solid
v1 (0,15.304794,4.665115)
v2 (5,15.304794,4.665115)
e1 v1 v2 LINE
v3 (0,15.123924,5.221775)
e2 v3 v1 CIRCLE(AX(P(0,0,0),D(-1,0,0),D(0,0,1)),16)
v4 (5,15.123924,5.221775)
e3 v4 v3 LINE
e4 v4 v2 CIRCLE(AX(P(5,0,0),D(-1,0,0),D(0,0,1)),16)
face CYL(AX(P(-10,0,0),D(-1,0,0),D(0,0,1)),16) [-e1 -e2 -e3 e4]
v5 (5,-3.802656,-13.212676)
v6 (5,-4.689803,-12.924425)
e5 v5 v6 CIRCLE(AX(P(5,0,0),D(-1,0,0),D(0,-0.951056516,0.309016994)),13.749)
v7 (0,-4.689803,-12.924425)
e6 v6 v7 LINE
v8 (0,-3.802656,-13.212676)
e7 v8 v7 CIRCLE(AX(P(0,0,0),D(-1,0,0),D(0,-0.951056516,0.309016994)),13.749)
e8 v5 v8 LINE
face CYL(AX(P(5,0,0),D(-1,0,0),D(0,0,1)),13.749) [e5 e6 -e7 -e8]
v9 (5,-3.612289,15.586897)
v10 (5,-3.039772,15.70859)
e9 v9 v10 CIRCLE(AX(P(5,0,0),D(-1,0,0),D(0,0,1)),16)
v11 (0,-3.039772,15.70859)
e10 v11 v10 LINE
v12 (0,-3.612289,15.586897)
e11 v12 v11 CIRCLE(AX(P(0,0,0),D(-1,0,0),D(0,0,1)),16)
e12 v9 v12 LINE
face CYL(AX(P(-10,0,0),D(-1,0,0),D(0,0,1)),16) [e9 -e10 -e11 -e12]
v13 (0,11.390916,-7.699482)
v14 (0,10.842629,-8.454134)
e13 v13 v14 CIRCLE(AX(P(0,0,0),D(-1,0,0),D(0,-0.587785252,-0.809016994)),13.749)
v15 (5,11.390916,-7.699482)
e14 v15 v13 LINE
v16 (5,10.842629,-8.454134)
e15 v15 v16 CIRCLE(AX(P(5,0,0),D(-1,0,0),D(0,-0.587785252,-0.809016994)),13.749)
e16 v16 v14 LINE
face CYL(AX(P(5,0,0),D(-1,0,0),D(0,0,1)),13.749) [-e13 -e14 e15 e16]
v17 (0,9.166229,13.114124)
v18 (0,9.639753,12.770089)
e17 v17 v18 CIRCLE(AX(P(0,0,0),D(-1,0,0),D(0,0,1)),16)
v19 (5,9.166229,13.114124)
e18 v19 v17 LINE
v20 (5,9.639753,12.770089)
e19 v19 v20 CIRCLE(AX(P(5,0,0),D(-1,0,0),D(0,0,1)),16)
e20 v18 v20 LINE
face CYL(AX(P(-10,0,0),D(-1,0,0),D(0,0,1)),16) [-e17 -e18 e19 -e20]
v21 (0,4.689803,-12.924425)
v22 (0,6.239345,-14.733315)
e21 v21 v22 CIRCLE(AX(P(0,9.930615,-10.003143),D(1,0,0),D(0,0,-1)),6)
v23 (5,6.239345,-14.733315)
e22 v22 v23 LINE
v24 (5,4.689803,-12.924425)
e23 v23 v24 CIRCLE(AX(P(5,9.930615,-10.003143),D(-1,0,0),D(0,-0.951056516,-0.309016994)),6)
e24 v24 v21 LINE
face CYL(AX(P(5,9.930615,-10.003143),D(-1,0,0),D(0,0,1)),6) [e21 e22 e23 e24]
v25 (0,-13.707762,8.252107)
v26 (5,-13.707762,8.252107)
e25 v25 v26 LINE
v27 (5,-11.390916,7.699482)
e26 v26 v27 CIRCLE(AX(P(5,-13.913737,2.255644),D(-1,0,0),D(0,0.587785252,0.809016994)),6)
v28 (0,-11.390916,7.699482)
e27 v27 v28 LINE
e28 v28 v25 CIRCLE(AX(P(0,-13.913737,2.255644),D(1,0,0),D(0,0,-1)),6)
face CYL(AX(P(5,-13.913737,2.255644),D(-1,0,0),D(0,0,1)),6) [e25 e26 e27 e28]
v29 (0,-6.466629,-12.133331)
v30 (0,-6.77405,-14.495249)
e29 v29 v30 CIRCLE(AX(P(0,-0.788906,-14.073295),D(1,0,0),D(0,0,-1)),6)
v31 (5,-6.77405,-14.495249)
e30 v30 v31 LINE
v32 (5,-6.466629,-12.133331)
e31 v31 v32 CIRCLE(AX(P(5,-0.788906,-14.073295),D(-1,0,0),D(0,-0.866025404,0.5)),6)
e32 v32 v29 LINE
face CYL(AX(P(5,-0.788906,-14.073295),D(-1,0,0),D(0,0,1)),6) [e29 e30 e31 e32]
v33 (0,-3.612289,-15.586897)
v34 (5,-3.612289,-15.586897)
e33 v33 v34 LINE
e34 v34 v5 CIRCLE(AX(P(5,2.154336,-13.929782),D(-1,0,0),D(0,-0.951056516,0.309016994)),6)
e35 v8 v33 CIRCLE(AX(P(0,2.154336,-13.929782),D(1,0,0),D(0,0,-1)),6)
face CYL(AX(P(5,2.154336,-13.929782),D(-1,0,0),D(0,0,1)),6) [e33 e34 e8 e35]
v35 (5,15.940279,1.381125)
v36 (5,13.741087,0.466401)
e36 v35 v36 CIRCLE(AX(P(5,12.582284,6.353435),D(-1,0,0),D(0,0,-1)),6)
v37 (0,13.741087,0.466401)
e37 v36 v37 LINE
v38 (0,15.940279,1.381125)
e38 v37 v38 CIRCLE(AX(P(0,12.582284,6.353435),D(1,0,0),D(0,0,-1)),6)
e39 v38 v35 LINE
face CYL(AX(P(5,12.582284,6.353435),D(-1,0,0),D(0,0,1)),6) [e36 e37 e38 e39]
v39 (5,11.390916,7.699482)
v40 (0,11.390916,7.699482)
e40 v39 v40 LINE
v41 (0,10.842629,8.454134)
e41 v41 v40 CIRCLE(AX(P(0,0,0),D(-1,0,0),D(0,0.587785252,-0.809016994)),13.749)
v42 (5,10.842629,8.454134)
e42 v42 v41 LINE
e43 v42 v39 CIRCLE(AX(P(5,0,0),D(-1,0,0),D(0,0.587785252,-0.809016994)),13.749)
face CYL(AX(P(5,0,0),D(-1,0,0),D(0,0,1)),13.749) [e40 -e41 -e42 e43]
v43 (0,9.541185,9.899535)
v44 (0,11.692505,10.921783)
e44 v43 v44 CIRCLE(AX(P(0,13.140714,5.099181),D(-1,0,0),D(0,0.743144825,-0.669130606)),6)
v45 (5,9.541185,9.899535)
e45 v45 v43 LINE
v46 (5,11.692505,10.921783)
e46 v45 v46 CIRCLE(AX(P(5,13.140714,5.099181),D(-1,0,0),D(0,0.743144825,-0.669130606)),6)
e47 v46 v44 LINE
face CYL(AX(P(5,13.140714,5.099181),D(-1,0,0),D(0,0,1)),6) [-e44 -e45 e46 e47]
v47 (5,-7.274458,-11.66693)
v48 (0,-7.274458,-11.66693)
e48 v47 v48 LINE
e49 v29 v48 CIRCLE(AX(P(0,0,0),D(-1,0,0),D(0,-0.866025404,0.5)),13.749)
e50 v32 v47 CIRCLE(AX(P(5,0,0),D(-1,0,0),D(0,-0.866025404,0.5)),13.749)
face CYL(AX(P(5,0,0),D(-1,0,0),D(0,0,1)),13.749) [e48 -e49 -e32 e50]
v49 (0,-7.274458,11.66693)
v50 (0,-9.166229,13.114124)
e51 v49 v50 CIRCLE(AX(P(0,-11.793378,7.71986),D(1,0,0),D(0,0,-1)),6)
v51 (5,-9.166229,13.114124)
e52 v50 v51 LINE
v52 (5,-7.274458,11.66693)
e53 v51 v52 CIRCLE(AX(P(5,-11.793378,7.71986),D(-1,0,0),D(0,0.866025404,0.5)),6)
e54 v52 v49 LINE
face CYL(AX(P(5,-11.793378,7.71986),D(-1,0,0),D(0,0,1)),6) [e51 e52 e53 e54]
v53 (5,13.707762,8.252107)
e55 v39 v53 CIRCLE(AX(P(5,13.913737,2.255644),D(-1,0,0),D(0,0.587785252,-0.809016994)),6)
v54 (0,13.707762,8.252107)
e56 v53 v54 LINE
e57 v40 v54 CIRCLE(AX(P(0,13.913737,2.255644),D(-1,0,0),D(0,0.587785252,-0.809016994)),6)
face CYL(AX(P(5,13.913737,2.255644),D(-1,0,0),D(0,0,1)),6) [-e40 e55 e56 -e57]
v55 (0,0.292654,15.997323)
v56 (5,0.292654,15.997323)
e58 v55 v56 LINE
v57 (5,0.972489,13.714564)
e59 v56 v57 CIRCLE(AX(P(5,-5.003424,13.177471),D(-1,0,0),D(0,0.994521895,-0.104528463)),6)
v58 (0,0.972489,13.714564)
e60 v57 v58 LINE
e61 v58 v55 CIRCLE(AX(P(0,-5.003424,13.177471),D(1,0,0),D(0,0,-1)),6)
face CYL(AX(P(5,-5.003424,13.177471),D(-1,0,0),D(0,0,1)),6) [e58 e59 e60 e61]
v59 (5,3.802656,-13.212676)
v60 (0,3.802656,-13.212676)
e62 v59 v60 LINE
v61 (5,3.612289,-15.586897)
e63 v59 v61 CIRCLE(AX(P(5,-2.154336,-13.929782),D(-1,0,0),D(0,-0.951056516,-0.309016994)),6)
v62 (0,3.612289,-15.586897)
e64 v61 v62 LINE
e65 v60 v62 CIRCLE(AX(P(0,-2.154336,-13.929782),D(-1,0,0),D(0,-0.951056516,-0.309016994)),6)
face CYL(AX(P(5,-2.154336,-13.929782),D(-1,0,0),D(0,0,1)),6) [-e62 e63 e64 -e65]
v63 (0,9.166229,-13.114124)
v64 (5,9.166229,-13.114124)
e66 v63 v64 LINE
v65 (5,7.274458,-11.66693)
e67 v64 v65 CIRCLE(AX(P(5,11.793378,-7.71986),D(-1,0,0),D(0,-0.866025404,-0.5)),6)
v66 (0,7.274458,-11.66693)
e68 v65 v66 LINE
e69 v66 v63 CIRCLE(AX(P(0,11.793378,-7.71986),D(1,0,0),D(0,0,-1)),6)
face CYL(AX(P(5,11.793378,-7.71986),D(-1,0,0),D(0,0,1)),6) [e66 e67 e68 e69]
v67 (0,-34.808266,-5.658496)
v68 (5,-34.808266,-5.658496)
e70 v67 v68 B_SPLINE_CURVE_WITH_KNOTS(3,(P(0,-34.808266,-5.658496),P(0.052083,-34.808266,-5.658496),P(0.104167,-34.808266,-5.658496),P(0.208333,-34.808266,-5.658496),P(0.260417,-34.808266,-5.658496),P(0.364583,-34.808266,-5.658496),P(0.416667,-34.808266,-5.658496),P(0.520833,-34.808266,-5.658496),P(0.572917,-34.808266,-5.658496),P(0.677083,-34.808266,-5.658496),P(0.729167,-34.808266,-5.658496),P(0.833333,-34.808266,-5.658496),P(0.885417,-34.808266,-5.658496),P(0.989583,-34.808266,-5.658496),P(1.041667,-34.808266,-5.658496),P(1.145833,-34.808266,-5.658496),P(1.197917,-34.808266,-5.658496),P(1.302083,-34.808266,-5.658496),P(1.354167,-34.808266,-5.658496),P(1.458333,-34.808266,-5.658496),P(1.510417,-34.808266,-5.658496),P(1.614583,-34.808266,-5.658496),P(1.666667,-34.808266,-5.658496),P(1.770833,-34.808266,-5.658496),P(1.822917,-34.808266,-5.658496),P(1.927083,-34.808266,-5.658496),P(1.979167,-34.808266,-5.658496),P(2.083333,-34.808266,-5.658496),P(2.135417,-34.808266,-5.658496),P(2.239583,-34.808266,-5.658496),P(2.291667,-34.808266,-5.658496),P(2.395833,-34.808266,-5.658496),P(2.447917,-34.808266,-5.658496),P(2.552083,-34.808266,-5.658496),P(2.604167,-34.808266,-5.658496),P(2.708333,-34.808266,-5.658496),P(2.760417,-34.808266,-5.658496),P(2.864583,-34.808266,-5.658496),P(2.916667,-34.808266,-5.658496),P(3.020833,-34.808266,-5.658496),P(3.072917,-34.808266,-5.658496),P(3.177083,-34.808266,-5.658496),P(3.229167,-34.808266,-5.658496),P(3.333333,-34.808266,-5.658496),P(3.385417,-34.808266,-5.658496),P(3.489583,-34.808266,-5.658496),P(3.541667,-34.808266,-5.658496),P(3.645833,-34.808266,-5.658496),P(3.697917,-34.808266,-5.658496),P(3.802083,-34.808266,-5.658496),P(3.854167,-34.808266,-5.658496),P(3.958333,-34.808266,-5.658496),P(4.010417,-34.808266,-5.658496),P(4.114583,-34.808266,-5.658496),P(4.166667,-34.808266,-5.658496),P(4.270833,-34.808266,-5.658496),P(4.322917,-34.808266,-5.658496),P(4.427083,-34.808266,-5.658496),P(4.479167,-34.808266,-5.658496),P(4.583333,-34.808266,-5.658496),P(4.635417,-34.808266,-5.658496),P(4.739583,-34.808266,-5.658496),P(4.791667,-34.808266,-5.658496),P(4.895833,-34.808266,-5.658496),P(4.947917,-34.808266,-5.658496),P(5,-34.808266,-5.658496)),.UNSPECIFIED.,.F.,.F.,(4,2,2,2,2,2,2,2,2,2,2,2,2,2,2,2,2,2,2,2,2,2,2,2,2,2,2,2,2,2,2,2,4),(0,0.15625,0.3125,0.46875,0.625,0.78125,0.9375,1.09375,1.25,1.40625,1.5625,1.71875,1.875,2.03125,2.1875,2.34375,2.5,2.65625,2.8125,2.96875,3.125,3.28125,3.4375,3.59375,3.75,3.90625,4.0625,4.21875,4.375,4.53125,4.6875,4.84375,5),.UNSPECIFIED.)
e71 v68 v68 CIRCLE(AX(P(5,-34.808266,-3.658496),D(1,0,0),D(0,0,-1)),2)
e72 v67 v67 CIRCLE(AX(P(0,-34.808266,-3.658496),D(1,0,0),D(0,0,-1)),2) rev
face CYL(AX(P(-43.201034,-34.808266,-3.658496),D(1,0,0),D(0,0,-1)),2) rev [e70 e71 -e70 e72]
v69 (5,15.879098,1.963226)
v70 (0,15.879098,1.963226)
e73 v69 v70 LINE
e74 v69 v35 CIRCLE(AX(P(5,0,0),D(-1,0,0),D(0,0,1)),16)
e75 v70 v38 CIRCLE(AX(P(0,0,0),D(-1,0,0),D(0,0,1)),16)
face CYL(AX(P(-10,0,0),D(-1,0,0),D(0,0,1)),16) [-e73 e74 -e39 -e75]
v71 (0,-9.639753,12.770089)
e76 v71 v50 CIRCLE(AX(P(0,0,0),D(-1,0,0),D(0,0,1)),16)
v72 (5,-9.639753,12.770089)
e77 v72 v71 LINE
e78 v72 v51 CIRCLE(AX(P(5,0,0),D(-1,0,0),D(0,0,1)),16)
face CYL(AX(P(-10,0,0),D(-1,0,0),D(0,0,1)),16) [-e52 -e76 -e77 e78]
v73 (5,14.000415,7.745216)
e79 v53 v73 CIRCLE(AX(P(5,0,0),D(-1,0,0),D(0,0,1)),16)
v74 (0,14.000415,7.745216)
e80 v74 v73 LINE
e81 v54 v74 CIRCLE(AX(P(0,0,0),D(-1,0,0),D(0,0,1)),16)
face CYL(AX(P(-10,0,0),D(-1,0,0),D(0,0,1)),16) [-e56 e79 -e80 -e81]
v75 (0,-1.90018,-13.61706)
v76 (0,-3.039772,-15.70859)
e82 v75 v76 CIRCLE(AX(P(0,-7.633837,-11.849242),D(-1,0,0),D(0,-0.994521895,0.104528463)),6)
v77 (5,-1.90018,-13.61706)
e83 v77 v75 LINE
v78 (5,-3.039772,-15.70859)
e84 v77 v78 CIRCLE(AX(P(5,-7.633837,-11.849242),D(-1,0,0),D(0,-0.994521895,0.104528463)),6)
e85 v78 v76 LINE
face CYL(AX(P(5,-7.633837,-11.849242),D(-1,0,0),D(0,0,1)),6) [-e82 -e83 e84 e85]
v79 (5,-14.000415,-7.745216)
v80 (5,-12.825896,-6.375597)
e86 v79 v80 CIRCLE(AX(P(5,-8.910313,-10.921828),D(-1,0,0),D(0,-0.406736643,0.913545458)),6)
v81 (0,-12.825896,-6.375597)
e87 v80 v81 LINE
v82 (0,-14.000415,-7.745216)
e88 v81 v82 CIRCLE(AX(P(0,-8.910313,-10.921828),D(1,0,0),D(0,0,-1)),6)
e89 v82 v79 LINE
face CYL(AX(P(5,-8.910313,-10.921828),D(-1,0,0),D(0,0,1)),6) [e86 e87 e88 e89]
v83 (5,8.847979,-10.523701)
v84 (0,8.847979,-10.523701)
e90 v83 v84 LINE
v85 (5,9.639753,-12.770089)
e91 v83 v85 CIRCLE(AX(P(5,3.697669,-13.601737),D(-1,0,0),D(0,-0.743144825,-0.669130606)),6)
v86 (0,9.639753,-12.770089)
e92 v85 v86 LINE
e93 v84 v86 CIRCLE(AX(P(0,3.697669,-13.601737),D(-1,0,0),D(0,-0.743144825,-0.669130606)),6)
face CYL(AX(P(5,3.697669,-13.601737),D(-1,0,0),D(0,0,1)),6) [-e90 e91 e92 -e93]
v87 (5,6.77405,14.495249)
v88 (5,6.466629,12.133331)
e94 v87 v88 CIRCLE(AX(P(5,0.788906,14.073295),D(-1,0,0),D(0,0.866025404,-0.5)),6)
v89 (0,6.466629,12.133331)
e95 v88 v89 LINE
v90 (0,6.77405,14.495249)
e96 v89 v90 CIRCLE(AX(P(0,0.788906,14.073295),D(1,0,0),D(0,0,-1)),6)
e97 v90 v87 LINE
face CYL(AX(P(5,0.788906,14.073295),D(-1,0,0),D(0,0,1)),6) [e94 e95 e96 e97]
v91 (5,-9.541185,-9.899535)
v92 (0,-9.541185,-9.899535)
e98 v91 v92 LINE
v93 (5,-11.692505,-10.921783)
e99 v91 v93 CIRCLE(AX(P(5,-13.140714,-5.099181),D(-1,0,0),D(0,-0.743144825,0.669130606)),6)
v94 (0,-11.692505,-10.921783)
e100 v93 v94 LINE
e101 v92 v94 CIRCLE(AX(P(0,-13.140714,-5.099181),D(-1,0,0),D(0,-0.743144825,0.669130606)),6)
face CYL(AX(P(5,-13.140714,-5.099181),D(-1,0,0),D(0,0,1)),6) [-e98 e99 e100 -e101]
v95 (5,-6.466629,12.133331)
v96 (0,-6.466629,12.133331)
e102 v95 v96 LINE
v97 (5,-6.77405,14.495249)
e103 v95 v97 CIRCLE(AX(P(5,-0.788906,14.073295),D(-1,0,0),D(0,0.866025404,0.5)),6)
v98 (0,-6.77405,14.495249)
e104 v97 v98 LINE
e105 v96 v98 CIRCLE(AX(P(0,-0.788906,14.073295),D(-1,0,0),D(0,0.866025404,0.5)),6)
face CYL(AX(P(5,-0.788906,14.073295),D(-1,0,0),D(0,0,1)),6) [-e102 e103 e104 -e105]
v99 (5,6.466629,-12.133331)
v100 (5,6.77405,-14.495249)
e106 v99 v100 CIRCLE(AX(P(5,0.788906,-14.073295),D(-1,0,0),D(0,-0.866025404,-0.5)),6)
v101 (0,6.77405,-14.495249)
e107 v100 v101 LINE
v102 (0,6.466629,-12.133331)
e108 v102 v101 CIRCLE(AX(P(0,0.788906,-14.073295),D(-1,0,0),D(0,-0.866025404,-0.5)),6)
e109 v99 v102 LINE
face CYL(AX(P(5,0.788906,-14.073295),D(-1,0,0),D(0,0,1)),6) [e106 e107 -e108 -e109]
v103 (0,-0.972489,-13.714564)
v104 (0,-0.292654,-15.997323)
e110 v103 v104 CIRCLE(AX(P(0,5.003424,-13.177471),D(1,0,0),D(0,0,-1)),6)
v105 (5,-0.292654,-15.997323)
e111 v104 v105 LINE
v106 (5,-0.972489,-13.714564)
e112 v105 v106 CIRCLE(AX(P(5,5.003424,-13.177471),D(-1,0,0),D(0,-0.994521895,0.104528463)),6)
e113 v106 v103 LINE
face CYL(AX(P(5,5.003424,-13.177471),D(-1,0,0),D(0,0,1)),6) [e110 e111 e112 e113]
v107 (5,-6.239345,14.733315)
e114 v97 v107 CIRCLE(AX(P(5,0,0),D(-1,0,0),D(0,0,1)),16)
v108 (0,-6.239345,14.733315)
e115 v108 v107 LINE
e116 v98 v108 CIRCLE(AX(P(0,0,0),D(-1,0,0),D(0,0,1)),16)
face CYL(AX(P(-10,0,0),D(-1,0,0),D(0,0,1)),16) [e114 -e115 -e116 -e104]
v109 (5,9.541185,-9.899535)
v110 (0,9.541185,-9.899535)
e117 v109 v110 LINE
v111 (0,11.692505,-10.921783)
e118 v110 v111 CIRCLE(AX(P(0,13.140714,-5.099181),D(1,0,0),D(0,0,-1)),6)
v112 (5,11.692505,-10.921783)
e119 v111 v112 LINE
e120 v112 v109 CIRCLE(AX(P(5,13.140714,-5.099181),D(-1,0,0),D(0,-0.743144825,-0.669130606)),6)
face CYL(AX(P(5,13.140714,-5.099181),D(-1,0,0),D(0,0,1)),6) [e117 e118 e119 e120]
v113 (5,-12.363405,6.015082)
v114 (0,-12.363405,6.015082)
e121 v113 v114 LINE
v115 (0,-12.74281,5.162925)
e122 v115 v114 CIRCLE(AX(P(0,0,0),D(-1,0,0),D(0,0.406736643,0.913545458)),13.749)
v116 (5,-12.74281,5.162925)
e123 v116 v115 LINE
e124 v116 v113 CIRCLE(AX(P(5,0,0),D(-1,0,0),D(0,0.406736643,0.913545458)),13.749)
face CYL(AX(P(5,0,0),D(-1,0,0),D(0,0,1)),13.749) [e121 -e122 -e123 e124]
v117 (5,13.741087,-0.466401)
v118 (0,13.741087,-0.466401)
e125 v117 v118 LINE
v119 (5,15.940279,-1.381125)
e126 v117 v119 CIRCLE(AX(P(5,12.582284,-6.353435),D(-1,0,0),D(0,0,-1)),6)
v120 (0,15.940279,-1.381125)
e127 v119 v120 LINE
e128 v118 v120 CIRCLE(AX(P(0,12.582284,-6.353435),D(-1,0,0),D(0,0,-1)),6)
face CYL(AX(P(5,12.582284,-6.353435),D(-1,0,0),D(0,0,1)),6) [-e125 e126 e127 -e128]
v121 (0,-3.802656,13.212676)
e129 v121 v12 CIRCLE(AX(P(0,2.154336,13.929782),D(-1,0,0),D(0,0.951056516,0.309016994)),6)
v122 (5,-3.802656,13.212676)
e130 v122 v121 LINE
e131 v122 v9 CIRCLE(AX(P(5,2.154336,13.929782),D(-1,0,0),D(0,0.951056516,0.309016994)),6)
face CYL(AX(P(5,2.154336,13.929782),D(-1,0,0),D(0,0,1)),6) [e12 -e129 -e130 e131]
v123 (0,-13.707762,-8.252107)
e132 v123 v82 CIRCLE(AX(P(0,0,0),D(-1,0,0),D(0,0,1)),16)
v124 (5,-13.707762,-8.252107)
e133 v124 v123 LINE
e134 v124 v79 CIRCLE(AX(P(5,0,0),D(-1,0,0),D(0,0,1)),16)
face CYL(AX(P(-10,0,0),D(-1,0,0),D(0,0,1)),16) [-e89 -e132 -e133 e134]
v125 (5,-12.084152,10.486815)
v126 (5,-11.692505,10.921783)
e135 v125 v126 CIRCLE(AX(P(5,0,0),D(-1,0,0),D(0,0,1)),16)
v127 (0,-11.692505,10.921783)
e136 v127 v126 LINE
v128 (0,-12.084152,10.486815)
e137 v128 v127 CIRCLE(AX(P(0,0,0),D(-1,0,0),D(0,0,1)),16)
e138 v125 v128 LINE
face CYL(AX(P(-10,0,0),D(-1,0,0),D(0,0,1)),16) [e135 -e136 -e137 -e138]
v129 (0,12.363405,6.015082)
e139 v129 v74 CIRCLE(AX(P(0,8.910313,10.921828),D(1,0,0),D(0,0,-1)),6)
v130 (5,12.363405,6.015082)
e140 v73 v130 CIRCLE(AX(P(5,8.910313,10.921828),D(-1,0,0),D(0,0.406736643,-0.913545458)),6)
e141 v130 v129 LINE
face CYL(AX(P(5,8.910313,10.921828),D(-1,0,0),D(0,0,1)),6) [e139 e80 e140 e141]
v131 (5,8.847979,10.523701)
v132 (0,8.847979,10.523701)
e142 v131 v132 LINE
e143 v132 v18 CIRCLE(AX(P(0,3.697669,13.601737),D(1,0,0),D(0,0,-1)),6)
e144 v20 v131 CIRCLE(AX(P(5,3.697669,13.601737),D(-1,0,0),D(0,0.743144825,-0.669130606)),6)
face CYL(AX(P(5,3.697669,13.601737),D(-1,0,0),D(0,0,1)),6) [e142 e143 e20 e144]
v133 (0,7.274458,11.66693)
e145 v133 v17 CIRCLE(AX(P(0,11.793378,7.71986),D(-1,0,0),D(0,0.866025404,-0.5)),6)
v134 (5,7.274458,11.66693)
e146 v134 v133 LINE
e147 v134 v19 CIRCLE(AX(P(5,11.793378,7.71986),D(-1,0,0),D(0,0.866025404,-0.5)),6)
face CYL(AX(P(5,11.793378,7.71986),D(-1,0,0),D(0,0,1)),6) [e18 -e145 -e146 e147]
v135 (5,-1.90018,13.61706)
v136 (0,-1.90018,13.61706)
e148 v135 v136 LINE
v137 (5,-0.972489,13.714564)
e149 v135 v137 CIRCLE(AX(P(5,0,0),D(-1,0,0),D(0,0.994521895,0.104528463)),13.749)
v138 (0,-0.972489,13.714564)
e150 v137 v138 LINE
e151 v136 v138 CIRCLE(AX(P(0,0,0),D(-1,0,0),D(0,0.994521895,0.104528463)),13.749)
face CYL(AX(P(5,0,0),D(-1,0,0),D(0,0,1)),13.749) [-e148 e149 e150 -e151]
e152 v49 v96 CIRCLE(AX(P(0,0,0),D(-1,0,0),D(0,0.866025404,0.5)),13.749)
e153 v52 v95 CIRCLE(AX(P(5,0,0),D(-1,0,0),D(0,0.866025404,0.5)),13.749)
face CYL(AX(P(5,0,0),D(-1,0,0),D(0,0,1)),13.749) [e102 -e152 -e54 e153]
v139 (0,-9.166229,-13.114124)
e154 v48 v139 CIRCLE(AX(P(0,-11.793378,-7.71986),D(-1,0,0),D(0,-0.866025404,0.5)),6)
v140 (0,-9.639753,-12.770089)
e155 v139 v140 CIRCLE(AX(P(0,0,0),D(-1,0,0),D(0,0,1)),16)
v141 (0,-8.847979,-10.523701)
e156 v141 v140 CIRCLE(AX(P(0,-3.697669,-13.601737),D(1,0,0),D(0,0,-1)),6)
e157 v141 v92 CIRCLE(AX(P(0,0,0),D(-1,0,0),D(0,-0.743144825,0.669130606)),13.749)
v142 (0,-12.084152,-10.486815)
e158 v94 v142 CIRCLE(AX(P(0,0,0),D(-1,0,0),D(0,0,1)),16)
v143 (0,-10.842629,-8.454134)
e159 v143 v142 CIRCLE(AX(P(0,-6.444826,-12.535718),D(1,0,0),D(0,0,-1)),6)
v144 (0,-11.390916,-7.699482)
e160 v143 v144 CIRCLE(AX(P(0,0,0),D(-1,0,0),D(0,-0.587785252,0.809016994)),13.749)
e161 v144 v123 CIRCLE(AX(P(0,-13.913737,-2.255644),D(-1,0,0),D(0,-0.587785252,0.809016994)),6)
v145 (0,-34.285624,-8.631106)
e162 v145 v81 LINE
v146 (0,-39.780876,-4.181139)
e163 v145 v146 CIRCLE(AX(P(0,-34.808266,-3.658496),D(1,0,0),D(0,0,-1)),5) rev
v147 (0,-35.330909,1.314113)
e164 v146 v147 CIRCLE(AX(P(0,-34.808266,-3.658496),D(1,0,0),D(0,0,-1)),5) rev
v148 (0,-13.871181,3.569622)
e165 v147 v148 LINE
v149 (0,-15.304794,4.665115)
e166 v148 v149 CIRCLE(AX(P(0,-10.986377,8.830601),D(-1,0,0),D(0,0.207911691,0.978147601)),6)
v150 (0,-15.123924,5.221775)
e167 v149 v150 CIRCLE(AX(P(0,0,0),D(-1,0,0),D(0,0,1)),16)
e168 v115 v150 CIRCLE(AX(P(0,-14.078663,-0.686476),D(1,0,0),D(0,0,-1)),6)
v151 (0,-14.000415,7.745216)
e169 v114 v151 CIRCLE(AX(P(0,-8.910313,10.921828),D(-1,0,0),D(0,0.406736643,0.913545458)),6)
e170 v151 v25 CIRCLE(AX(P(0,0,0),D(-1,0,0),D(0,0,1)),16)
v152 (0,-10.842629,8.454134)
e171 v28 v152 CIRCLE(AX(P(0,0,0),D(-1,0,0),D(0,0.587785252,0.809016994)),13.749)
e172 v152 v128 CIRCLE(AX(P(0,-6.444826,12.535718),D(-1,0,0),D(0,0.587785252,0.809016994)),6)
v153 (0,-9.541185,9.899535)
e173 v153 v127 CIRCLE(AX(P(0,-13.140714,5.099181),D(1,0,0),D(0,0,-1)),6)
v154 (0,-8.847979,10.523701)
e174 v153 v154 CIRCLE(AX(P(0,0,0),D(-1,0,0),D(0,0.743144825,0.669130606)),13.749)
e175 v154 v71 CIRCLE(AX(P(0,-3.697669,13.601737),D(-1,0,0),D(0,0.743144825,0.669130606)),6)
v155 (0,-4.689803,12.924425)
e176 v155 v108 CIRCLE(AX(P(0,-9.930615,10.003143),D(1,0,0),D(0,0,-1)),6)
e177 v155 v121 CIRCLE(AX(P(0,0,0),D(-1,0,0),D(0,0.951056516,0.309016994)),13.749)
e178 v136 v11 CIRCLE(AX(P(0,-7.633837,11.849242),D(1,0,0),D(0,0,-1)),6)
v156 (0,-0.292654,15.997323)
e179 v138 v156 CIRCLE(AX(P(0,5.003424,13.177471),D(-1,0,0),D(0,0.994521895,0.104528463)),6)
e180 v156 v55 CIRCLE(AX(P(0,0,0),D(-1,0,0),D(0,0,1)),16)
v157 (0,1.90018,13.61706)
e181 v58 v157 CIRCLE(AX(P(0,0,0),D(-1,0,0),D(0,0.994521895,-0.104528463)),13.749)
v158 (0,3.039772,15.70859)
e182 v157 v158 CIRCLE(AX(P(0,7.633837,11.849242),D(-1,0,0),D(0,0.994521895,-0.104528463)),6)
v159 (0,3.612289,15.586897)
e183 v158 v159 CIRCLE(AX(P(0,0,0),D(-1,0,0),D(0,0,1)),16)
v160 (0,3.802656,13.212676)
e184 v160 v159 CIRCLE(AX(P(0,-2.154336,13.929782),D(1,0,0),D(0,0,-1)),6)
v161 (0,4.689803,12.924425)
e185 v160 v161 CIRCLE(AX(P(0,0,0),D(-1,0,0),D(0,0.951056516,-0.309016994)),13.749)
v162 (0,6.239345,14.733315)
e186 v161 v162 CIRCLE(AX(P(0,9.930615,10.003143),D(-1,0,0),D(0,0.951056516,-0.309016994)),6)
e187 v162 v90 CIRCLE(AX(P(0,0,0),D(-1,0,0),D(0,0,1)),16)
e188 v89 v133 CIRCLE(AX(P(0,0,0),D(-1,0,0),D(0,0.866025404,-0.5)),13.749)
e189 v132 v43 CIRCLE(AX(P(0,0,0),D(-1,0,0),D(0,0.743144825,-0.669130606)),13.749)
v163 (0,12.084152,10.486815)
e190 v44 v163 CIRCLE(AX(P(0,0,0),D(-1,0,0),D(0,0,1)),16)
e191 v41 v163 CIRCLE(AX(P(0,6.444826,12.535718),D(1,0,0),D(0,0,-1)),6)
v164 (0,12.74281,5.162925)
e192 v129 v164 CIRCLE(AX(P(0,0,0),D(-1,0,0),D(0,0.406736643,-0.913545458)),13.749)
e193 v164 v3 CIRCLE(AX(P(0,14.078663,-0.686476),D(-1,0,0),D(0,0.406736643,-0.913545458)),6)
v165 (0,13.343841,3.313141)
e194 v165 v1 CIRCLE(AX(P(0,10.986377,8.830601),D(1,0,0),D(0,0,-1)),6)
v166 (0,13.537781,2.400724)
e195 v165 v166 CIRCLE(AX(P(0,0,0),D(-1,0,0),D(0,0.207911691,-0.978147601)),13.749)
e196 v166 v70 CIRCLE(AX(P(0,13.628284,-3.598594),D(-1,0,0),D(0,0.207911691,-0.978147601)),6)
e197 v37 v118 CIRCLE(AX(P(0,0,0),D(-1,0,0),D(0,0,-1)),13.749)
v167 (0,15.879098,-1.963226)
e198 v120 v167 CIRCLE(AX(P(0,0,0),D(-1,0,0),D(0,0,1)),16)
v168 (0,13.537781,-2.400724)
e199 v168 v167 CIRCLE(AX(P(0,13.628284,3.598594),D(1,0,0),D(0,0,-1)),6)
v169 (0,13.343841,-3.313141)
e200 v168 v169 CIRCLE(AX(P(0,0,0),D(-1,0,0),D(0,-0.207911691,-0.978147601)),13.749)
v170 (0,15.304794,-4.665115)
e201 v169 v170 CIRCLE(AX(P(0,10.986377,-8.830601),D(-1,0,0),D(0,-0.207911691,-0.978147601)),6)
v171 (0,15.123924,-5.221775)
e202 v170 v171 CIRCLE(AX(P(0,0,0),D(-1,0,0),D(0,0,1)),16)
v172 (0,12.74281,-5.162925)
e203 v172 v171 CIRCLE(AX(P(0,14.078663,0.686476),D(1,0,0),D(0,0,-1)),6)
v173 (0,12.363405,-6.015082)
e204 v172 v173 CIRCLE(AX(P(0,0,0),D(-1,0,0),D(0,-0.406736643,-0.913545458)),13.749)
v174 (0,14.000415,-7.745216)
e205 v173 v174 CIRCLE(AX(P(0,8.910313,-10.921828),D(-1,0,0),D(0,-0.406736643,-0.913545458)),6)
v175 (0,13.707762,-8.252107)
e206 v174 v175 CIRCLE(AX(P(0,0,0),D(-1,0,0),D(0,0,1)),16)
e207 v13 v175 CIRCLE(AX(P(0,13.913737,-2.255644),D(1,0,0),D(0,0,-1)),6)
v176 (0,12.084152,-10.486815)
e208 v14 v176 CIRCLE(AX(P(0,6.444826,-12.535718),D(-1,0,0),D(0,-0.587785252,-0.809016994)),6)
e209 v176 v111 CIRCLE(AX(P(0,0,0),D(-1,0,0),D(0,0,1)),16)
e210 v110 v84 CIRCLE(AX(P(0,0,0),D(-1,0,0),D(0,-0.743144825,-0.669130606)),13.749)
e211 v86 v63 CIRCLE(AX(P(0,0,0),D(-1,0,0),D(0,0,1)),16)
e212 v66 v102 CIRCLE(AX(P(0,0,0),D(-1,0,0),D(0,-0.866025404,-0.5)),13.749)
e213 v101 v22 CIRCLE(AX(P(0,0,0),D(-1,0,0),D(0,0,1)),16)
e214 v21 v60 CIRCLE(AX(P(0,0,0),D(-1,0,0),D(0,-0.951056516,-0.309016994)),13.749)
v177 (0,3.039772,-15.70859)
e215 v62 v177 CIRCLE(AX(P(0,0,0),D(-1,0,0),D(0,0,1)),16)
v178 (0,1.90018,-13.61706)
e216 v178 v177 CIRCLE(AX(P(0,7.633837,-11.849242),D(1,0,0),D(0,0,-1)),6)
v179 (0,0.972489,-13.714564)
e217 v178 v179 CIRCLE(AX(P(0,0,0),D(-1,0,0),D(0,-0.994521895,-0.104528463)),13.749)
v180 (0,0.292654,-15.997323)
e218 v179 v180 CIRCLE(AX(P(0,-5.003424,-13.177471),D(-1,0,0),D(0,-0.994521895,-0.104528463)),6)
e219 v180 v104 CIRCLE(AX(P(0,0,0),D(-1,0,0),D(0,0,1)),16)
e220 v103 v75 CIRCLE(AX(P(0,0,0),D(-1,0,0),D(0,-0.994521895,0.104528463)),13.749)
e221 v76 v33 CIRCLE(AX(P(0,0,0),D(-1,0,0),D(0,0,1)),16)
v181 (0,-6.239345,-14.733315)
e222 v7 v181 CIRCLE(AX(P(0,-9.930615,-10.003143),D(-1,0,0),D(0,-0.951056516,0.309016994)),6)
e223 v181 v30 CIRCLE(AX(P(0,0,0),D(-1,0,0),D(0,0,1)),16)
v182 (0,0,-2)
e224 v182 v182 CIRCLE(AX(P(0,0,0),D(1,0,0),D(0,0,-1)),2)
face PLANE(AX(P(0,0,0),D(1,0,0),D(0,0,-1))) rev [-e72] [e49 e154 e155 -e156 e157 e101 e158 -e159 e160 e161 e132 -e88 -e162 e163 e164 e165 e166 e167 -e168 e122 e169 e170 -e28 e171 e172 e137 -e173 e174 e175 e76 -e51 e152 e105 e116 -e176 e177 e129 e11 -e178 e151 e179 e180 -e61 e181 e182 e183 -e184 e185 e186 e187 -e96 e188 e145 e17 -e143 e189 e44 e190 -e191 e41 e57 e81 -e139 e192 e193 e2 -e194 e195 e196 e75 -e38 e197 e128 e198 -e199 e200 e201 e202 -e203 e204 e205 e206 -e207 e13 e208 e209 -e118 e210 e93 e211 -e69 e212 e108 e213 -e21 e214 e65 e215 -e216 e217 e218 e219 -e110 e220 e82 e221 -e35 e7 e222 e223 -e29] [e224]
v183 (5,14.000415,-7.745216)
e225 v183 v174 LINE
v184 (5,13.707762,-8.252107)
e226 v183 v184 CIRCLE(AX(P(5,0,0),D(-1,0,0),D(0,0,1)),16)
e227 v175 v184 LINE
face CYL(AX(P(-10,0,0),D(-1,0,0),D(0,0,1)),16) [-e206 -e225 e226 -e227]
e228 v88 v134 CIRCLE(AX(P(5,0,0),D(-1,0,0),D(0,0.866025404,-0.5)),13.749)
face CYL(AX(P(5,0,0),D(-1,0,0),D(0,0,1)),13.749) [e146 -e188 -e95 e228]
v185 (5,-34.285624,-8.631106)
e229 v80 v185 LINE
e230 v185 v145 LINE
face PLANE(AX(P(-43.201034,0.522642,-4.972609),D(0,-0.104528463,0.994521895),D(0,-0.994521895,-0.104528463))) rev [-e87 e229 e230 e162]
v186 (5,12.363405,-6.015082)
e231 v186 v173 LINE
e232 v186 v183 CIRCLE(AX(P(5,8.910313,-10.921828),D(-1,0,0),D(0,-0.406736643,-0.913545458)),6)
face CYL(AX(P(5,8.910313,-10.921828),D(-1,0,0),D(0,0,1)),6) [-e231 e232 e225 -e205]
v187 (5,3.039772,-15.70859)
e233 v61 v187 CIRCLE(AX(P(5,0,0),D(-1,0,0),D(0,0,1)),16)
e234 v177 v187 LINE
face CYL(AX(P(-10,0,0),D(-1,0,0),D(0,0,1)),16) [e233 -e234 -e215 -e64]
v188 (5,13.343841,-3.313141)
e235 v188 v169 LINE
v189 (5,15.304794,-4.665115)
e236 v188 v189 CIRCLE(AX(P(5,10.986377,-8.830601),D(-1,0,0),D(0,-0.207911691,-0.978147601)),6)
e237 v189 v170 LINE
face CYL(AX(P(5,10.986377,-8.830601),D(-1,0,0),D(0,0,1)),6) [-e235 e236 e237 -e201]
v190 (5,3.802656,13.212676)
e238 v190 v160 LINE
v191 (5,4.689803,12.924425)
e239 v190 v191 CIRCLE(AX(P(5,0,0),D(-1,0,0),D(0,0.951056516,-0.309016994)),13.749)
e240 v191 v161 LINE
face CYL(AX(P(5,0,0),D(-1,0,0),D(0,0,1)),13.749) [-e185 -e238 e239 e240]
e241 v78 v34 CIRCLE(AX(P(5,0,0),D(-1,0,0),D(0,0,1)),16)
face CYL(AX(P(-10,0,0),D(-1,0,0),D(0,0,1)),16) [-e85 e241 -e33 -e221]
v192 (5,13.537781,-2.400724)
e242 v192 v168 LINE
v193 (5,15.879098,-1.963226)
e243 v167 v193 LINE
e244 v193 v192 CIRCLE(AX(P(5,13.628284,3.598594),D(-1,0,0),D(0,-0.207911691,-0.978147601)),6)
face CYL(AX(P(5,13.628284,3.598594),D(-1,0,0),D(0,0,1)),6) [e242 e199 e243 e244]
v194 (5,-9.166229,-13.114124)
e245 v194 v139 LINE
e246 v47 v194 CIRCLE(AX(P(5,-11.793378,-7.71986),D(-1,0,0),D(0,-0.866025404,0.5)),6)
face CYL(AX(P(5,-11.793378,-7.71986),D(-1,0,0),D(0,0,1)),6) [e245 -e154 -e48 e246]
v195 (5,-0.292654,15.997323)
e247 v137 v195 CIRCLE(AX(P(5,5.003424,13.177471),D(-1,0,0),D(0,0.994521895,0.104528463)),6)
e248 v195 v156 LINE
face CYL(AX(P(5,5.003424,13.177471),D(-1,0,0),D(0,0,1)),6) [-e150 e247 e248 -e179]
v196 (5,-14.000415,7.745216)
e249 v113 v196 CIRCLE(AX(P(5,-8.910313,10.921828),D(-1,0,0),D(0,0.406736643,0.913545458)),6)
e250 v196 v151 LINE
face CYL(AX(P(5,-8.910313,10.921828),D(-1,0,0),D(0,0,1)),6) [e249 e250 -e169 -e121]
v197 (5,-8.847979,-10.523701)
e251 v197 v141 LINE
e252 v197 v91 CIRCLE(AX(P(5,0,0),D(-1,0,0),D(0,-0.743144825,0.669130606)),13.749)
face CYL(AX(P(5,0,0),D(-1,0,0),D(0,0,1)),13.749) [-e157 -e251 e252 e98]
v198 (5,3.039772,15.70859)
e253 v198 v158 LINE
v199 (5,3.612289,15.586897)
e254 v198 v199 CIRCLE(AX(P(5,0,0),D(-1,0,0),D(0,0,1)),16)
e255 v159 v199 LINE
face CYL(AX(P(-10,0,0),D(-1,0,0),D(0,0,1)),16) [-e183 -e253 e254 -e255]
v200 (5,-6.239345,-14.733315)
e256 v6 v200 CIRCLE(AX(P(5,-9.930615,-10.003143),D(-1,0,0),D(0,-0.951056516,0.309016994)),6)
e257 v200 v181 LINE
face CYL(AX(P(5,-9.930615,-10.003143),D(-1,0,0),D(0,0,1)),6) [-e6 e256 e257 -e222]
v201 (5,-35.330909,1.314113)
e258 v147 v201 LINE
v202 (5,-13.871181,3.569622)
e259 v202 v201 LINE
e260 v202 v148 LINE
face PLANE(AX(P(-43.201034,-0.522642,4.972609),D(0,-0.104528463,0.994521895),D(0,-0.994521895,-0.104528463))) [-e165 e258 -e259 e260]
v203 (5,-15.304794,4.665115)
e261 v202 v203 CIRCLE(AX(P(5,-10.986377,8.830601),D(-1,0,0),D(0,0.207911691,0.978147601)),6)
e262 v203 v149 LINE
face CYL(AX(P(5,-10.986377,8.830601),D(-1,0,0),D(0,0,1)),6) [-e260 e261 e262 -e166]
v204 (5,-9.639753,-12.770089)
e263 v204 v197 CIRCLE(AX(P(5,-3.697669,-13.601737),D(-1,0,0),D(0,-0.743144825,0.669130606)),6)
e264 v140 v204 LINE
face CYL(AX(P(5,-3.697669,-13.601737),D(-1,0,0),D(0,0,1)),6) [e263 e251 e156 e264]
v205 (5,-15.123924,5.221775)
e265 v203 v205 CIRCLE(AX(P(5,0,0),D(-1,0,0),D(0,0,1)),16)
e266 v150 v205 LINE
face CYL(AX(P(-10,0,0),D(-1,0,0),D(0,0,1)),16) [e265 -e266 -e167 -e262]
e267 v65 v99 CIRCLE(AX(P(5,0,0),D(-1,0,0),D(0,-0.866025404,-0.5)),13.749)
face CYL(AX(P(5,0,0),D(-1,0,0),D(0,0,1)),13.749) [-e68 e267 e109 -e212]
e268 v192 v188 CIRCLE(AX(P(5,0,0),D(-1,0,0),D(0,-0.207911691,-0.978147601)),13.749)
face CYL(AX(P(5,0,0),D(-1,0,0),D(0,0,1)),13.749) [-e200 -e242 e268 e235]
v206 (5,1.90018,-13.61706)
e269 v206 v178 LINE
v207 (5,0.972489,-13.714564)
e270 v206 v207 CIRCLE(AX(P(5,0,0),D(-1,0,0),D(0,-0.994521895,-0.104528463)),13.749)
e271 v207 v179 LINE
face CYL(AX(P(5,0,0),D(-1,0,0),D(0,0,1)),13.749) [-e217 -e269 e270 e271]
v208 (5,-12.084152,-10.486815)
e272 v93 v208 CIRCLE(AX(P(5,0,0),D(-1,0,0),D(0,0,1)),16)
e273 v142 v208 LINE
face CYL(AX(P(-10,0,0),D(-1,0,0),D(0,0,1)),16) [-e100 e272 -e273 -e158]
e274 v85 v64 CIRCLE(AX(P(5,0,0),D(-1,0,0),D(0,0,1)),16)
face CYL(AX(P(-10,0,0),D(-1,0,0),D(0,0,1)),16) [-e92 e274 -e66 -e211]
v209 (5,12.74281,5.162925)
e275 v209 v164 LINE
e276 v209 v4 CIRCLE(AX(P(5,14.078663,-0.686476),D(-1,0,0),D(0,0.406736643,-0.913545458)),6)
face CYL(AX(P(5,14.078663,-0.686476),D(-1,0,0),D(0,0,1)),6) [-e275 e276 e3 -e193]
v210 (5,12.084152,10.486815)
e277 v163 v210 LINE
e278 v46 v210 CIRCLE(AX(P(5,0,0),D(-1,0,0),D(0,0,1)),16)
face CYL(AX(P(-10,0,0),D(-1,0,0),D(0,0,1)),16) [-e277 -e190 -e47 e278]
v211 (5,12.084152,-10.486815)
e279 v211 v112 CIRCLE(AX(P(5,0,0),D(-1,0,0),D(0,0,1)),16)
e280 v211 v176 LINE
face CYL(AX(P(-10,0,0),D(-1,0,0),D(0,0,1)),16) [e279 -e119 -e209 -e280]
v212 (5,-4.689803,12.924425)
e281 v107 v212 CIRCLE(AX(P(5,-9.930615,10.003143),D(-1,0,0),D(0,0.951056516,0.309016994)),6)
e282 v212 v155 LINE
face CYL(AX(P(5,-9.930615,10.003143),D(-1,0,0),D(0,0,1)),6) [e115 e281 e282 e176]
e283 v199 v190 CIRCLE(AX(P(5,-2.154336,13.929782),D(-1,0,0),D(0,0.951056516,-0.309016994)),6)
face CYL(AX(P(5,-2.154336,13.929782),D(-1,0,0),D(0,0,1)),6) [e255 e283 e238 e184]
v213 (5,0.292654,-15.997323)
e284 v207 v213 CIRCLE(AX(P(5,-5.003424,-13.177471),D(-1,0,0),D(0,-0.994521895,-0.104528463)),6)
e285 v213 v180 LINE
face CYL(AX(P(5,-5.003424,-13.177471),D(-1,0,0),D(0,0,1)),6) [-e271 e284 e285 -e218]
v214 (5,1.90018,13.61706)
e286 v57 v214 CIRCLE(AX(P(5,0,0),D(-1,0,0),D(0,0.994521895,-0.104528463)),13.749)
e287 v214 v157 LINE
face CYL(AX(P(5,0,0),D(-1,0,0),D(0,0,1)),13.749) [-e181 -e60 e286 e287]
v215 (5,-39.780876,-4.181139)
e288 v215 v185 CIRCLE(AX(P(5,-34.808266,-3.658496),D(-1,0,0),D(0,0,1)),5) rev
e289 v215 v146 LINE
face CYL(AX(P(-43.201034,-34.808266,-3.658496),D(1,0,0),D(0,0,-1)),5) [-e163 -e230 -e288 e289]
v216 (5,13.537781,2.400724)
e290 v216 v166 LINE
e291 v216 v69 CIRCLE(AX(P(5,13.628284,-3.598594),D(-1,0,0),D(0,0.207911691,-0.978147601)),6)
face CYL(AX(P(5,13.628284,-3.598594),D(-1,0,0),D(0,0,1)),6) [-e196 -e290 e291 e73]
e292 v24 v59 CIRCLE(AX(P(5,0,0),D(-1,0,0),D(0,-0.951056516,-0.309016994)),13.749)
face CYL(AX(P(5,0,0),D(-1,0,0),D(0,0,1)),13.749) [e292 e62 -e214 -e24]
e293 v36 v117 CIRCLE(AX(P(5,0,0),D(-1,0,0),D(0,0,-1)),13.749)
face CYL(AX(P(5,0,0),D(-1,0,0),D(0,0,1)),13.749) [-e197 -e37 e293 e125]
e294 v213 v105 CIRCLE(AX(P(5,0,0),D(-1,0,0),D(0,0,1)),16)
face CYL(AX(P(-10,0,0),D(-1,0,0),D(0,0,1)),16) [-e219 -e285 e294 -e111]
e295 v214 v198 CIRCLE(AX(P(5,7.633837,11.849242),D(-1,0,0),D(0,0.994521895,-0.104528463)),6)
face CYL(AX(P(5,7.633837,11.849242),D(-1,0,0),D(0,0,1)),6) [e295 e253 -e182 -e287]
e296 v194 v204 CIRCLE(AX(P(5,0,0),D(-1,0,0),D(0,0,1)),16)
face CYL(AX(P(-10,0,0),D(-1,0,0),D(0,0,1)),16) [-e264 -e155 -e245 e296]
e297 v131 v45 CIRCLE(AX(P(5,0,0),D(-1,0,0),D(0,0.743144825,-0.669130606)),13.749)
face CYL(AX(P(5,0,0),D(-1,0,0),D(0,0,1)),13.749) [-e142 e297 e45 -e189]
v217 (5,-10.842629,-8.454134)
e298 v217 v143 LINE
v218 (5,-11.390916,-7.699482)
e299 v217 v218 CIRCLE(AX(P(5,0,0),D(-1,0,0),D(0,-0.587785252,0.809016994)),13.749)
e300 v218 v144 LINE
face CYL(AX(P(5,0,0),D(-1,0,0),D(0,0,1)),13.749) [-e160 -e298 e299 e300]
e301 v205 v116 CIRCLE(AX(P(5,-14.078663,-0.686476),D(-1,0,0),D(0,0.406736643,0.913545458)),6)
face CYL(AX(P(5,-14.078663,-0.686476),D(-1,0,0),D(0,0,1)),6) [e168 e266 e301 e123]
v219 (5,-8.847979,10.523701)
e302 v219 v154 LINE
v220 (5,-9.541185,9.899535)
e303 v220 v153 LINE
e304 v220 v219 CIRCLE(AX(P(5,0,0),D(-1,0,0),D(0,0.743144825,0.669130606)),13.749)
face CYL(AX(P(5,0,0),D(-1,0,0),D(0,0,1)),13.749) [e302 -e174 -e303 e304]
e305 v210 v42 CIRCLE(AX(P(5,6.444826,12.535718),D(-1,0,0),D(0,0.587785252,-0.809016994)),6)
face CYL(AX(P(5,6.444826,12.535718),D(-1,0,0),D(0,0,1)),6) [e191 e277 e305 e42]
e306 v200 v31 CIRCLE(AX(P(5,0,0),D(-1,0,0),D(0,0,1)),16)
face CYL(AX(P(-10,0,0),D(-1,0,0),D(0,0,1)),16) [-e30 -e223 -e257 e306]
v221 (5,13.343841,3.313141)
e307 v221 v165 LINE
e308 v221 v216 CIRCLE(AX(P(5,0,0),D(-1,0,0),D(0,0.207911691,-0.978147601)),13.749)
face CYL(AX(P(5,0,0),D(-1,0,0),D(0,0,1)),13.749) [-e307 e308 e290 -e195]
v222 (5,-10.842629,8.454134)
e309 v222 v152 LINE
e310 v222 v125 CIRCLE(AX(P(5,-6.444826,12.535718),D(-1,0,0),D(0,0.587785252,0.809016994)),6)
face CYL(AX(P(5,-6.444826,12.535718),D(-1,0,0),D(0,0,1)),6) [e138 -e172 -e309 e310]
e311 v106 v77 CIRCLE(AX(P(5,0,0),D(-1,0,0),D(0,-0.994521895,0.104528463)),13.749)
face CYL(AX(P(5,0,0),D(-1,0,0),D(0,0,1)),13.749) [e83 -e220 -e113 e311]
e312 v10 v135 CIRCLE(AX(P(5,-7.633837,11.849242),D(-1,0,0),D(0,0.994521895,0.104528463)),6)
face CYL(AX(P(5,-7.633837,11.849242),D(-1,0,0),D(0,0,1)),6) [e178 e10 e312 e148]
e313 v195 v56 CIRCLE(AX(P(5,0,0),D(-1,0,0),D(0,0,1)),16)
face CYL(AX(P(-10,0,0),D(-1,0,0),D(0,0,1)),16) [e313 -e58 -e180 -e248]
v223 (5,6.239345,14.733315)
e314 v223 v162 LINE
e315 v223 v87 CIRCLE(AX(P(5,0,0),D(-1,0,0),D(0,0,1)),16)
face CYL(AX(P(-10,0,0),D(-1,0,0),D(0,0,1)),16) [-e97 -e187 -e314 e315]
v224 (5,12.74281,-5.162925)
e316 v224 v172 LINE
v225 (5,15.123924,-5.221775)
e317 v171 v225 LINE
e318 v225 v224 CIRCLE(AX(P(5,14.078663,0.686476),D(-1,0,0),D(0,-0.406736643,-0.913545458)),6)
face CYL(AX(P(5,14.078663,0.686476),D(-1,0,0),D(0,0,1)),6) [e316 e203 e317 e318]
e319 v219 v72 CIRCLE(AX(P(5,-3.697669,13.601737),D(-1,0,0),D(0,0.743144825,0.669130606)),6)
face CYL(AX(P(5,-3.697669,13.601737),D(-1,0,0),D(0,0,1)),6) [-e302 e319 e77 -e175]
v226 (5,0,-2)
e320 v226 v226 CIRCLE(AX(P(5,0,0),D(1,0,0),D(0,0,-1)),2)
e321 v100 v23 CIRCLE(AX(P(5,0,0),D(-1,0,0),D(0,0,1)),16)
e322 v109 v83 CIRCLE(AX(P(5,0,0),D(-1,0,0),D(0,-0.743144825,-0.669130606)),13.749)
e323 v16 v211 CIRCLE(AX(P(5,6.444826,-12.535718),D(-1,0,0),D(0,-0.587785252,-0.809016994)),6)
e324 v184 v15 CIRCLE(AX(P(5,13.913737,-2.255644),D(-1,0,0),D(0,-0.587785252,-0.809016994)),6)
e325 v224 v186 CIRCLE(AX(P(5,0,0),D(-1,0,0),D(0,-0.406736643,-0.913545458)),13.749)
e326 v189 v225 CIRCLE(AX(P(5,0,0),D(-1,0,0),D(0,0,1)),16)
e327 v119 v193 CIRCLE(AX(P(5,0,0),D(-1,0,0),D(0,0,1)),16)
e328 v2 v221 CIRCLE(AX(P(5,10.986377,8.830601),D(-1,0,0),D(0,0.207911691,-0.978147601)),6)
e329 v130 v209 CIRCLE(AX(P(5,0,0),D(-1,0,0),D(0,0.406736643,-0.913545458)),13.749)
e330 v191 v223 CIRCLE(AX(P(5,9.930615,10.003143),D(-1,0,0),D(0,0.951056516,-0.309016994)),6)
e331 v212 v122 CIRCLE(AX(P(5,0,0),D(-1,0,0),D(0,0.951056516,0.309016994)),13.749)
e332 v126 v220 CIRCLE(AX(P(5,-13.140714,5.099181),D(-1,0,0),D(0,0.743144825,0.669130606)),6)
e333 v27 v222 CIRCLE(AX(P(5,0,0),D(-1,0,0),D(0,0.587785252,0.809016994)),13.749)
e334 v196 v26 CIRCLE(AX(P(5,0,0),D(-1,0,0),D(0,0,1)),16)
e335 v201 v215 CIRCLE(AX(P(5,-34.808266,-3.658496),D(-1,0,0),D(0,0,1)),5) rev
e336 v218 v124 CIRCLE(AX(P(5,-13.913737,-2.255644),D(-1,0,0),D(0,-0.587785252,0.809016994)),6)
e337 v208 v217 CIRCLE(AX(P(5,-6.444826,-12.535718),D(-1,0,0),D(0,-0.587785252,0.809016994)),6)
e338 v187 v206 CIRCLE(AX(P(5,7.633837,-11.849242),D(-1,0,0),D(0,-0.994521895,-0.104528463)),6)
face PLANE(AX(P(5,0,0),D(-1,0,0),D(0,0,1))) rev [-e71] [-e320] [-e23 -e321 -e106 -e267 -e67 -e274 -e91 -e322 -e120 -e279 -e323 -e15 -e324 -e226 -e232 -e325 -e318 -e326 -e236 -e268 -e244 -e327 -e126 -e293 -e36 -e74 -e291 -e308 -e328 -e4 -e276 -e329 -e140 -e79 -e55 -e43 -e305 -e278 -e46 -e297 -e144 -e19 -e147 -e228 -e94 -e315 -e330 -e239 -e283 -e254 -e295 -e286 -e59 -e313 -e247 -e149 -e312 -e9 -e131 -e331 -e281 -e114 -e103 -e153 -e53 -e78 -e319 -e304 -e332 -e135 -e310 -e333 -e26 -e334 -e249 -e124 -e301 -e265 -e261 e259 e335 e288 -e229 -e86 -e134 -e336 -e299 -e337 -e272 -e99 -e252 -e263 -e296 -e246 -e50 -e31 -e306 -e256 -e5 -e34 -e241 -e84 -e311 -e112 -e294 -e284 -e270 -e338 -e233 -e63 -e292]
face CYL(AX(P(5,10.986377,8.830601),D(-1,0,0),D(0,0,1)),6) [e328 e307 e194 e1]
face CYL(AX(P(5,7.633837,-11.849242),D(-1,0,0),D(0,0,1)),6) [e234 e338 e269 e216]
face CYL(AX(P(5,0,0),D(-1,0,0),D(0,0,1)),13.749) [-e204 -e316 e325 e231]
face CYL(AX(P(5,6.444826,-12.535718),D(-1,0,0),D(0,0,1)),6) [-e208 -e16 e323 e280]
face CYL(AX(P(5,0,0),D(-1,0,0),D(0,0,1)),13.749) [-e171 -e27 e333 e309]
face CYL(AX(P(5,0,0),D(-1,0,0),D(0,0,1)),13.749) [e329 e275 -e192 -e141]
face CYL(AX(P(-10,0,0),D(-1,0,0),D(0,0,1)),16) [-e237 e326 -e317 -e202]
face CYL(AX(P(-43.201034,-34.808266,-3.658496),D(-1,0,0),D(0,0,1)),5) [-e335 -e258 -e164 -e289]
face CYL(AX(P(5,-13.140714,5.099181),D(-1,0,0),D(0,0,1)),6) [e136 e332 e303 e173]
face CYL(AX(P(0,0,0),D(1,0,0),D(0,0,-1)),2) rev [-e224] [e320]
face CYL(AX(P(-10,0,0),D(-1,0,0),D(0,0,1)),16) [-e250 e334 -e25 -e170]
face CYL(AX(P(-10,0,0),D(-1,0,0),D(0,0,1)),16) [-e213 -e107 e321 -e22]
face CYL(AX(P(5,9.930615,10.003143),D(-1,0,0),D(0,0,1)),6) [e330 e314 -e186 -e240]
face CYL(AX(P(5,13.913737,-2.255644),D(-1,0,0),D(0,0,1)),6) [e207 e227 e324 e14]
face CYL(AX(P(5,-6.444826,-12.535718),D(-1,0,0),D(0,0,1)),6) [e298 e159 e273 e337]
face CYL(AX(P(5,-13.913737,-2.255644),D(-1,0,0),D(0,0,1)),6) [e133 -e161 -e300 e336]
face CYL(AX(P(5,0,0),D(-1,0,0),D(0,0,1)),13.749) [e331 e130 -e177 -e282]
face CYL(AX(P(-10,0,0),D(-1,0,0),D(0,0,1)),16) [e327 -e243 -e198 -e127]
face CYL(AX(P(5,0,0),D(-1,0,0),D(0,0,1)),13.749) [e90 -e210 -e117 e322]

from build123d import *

# Parameters (mm, degrees)
BASPROSKE_W         = 5
BASPROSKE_H         = 16
TOOTHCUT_DEPTH      = 24.173260453
TEETHCUTS_COUNT     = 30
TEETHCUTS_ANGLE     = 348
BORSKE_R            = 0.4
BORE_DEPTH          = 50.0000508
SKETCH1_R           = 2
BOSS_EXTRUDE1_DEPTH = 5
SKETCH2_R           = 2
CUT_EXTRUDE1_DEPTH  = 44.650585033
FILLET1_R           = 5


with BuildPart() as part:
    # BasProSke → Base-Revolve (revolve)
    with BuildSketch(Plane(origin=(0, 0, 0), x_dir=(1, 0, 0), z_dir=(0, 1, 0)), mode=Mode.PRIVATE) as base_revolve_sk:
        with Locations((2.5, 8)):
            Rectangle(BASPROSKE_W, BASPROSKE_H)
    revolve(base_revolve_sk.sketch.rotate(Axis((-10, 0, 0), (1, 0, 0)), 180), axis=Axis((-10, 0, 0), (1, 0, 0)))

    # TooCutSke → ToothCut (cut, through all)
    with BuildSketch(Plane(origin=(0, 0, 0), x_dir=(0, 0, -1), z_dir=(1, 0, 0))):
        with BuildLine():
            ThreePointArc((0.466400716, 13.741086979), (0, 13.749), (-0.466400716, 13.741086979))
            ThreePointArc((-0.466400716, 13.741086979), (-0.819142092, 14.899954875), (-1.3974676, 15.964351834))
            ThreePointArc((-1.3974676, 15.964351834), (0, 16.0254), (1.3974676, 15.964351834))
            ThreePointArc((1.3974676, 15.964351834), (0.819142092, 14.899954875), (0.466400716, 13.741086979))
        make_face()
    toothcut = extrude(amount=TOOTHCUT_DEPTH, mode=Mode.SUBTRACT)

    # TeethCuts: ToothCut ×30 about axis
    teethcuts_axis = Axis((-10, 0, 0), (1, 0, 0))
    for i in range(1, TEETHCUTS_COUNT):
        add(toothcut.rotate(teethcuts_axis, i * TEETHCUTS_ANGLE / (TEETHCUTS_COUNT - 1)), mode=Mode.SUBTRACT)

    # BorSke → Bore (cut, symmetric)
    with BuildSketch(Plane(origin=(0, 0, 0), x_dir=(0, 0, -1), z_dir=(1, 0, 0))):
        with Locations(Location((0, 0, 0), (0, 0, 180))):
            Circle(BORSKE_R)
    extrude(amount=BORE_DEPTH, both=True, mode=Mode.SUBTRACT)

    # Sketch1 → Boss-Extrude1 (add)
    with BuildSketch(Plane(origin=(5, 0, 0), x_dir=(0, 0, -1), z_dir=(1, 0, 0))):
        Polygon((4.972609477, 0.522642316), (9.153748008, -39.258233498), (-0.791470946, -40.303518131), (-4.972609477, -0.522642316), align=None)
        with Locations((3.658496214, -34.808266338)):
            Circle(SKETCH1_R, mode=Mode.SUBTRACT)
    extrude(amount=-BOSS_EXTRUDE1_DEPTH)

    # Sketch2 → Cut-Extrude1 (cut, through all)
    with BuildSketch(Plane(origin=(5, 0, 0), x_dir=(0, 0, -1), z_dir=(1, 0, 0))):
        Circle(SKETCH2_R)
    extrude(amount=-CUT_EXTRUDE1_DEPTH, mode=Mode.SUBTRACT)

    # Fillet1
    fillet1_edges = [part.edges().sort_by_distance(p)[0] for p in [
        (2.5, -39.258233498, -9.153748008),
        (2.5, -40.303518131, 0.791470946),
    ]]
    fillet(fillet1_edges, radius=FILLET1_R - 0.0001)  # a hair under: the kernel refuses the full size


solid = part.part
